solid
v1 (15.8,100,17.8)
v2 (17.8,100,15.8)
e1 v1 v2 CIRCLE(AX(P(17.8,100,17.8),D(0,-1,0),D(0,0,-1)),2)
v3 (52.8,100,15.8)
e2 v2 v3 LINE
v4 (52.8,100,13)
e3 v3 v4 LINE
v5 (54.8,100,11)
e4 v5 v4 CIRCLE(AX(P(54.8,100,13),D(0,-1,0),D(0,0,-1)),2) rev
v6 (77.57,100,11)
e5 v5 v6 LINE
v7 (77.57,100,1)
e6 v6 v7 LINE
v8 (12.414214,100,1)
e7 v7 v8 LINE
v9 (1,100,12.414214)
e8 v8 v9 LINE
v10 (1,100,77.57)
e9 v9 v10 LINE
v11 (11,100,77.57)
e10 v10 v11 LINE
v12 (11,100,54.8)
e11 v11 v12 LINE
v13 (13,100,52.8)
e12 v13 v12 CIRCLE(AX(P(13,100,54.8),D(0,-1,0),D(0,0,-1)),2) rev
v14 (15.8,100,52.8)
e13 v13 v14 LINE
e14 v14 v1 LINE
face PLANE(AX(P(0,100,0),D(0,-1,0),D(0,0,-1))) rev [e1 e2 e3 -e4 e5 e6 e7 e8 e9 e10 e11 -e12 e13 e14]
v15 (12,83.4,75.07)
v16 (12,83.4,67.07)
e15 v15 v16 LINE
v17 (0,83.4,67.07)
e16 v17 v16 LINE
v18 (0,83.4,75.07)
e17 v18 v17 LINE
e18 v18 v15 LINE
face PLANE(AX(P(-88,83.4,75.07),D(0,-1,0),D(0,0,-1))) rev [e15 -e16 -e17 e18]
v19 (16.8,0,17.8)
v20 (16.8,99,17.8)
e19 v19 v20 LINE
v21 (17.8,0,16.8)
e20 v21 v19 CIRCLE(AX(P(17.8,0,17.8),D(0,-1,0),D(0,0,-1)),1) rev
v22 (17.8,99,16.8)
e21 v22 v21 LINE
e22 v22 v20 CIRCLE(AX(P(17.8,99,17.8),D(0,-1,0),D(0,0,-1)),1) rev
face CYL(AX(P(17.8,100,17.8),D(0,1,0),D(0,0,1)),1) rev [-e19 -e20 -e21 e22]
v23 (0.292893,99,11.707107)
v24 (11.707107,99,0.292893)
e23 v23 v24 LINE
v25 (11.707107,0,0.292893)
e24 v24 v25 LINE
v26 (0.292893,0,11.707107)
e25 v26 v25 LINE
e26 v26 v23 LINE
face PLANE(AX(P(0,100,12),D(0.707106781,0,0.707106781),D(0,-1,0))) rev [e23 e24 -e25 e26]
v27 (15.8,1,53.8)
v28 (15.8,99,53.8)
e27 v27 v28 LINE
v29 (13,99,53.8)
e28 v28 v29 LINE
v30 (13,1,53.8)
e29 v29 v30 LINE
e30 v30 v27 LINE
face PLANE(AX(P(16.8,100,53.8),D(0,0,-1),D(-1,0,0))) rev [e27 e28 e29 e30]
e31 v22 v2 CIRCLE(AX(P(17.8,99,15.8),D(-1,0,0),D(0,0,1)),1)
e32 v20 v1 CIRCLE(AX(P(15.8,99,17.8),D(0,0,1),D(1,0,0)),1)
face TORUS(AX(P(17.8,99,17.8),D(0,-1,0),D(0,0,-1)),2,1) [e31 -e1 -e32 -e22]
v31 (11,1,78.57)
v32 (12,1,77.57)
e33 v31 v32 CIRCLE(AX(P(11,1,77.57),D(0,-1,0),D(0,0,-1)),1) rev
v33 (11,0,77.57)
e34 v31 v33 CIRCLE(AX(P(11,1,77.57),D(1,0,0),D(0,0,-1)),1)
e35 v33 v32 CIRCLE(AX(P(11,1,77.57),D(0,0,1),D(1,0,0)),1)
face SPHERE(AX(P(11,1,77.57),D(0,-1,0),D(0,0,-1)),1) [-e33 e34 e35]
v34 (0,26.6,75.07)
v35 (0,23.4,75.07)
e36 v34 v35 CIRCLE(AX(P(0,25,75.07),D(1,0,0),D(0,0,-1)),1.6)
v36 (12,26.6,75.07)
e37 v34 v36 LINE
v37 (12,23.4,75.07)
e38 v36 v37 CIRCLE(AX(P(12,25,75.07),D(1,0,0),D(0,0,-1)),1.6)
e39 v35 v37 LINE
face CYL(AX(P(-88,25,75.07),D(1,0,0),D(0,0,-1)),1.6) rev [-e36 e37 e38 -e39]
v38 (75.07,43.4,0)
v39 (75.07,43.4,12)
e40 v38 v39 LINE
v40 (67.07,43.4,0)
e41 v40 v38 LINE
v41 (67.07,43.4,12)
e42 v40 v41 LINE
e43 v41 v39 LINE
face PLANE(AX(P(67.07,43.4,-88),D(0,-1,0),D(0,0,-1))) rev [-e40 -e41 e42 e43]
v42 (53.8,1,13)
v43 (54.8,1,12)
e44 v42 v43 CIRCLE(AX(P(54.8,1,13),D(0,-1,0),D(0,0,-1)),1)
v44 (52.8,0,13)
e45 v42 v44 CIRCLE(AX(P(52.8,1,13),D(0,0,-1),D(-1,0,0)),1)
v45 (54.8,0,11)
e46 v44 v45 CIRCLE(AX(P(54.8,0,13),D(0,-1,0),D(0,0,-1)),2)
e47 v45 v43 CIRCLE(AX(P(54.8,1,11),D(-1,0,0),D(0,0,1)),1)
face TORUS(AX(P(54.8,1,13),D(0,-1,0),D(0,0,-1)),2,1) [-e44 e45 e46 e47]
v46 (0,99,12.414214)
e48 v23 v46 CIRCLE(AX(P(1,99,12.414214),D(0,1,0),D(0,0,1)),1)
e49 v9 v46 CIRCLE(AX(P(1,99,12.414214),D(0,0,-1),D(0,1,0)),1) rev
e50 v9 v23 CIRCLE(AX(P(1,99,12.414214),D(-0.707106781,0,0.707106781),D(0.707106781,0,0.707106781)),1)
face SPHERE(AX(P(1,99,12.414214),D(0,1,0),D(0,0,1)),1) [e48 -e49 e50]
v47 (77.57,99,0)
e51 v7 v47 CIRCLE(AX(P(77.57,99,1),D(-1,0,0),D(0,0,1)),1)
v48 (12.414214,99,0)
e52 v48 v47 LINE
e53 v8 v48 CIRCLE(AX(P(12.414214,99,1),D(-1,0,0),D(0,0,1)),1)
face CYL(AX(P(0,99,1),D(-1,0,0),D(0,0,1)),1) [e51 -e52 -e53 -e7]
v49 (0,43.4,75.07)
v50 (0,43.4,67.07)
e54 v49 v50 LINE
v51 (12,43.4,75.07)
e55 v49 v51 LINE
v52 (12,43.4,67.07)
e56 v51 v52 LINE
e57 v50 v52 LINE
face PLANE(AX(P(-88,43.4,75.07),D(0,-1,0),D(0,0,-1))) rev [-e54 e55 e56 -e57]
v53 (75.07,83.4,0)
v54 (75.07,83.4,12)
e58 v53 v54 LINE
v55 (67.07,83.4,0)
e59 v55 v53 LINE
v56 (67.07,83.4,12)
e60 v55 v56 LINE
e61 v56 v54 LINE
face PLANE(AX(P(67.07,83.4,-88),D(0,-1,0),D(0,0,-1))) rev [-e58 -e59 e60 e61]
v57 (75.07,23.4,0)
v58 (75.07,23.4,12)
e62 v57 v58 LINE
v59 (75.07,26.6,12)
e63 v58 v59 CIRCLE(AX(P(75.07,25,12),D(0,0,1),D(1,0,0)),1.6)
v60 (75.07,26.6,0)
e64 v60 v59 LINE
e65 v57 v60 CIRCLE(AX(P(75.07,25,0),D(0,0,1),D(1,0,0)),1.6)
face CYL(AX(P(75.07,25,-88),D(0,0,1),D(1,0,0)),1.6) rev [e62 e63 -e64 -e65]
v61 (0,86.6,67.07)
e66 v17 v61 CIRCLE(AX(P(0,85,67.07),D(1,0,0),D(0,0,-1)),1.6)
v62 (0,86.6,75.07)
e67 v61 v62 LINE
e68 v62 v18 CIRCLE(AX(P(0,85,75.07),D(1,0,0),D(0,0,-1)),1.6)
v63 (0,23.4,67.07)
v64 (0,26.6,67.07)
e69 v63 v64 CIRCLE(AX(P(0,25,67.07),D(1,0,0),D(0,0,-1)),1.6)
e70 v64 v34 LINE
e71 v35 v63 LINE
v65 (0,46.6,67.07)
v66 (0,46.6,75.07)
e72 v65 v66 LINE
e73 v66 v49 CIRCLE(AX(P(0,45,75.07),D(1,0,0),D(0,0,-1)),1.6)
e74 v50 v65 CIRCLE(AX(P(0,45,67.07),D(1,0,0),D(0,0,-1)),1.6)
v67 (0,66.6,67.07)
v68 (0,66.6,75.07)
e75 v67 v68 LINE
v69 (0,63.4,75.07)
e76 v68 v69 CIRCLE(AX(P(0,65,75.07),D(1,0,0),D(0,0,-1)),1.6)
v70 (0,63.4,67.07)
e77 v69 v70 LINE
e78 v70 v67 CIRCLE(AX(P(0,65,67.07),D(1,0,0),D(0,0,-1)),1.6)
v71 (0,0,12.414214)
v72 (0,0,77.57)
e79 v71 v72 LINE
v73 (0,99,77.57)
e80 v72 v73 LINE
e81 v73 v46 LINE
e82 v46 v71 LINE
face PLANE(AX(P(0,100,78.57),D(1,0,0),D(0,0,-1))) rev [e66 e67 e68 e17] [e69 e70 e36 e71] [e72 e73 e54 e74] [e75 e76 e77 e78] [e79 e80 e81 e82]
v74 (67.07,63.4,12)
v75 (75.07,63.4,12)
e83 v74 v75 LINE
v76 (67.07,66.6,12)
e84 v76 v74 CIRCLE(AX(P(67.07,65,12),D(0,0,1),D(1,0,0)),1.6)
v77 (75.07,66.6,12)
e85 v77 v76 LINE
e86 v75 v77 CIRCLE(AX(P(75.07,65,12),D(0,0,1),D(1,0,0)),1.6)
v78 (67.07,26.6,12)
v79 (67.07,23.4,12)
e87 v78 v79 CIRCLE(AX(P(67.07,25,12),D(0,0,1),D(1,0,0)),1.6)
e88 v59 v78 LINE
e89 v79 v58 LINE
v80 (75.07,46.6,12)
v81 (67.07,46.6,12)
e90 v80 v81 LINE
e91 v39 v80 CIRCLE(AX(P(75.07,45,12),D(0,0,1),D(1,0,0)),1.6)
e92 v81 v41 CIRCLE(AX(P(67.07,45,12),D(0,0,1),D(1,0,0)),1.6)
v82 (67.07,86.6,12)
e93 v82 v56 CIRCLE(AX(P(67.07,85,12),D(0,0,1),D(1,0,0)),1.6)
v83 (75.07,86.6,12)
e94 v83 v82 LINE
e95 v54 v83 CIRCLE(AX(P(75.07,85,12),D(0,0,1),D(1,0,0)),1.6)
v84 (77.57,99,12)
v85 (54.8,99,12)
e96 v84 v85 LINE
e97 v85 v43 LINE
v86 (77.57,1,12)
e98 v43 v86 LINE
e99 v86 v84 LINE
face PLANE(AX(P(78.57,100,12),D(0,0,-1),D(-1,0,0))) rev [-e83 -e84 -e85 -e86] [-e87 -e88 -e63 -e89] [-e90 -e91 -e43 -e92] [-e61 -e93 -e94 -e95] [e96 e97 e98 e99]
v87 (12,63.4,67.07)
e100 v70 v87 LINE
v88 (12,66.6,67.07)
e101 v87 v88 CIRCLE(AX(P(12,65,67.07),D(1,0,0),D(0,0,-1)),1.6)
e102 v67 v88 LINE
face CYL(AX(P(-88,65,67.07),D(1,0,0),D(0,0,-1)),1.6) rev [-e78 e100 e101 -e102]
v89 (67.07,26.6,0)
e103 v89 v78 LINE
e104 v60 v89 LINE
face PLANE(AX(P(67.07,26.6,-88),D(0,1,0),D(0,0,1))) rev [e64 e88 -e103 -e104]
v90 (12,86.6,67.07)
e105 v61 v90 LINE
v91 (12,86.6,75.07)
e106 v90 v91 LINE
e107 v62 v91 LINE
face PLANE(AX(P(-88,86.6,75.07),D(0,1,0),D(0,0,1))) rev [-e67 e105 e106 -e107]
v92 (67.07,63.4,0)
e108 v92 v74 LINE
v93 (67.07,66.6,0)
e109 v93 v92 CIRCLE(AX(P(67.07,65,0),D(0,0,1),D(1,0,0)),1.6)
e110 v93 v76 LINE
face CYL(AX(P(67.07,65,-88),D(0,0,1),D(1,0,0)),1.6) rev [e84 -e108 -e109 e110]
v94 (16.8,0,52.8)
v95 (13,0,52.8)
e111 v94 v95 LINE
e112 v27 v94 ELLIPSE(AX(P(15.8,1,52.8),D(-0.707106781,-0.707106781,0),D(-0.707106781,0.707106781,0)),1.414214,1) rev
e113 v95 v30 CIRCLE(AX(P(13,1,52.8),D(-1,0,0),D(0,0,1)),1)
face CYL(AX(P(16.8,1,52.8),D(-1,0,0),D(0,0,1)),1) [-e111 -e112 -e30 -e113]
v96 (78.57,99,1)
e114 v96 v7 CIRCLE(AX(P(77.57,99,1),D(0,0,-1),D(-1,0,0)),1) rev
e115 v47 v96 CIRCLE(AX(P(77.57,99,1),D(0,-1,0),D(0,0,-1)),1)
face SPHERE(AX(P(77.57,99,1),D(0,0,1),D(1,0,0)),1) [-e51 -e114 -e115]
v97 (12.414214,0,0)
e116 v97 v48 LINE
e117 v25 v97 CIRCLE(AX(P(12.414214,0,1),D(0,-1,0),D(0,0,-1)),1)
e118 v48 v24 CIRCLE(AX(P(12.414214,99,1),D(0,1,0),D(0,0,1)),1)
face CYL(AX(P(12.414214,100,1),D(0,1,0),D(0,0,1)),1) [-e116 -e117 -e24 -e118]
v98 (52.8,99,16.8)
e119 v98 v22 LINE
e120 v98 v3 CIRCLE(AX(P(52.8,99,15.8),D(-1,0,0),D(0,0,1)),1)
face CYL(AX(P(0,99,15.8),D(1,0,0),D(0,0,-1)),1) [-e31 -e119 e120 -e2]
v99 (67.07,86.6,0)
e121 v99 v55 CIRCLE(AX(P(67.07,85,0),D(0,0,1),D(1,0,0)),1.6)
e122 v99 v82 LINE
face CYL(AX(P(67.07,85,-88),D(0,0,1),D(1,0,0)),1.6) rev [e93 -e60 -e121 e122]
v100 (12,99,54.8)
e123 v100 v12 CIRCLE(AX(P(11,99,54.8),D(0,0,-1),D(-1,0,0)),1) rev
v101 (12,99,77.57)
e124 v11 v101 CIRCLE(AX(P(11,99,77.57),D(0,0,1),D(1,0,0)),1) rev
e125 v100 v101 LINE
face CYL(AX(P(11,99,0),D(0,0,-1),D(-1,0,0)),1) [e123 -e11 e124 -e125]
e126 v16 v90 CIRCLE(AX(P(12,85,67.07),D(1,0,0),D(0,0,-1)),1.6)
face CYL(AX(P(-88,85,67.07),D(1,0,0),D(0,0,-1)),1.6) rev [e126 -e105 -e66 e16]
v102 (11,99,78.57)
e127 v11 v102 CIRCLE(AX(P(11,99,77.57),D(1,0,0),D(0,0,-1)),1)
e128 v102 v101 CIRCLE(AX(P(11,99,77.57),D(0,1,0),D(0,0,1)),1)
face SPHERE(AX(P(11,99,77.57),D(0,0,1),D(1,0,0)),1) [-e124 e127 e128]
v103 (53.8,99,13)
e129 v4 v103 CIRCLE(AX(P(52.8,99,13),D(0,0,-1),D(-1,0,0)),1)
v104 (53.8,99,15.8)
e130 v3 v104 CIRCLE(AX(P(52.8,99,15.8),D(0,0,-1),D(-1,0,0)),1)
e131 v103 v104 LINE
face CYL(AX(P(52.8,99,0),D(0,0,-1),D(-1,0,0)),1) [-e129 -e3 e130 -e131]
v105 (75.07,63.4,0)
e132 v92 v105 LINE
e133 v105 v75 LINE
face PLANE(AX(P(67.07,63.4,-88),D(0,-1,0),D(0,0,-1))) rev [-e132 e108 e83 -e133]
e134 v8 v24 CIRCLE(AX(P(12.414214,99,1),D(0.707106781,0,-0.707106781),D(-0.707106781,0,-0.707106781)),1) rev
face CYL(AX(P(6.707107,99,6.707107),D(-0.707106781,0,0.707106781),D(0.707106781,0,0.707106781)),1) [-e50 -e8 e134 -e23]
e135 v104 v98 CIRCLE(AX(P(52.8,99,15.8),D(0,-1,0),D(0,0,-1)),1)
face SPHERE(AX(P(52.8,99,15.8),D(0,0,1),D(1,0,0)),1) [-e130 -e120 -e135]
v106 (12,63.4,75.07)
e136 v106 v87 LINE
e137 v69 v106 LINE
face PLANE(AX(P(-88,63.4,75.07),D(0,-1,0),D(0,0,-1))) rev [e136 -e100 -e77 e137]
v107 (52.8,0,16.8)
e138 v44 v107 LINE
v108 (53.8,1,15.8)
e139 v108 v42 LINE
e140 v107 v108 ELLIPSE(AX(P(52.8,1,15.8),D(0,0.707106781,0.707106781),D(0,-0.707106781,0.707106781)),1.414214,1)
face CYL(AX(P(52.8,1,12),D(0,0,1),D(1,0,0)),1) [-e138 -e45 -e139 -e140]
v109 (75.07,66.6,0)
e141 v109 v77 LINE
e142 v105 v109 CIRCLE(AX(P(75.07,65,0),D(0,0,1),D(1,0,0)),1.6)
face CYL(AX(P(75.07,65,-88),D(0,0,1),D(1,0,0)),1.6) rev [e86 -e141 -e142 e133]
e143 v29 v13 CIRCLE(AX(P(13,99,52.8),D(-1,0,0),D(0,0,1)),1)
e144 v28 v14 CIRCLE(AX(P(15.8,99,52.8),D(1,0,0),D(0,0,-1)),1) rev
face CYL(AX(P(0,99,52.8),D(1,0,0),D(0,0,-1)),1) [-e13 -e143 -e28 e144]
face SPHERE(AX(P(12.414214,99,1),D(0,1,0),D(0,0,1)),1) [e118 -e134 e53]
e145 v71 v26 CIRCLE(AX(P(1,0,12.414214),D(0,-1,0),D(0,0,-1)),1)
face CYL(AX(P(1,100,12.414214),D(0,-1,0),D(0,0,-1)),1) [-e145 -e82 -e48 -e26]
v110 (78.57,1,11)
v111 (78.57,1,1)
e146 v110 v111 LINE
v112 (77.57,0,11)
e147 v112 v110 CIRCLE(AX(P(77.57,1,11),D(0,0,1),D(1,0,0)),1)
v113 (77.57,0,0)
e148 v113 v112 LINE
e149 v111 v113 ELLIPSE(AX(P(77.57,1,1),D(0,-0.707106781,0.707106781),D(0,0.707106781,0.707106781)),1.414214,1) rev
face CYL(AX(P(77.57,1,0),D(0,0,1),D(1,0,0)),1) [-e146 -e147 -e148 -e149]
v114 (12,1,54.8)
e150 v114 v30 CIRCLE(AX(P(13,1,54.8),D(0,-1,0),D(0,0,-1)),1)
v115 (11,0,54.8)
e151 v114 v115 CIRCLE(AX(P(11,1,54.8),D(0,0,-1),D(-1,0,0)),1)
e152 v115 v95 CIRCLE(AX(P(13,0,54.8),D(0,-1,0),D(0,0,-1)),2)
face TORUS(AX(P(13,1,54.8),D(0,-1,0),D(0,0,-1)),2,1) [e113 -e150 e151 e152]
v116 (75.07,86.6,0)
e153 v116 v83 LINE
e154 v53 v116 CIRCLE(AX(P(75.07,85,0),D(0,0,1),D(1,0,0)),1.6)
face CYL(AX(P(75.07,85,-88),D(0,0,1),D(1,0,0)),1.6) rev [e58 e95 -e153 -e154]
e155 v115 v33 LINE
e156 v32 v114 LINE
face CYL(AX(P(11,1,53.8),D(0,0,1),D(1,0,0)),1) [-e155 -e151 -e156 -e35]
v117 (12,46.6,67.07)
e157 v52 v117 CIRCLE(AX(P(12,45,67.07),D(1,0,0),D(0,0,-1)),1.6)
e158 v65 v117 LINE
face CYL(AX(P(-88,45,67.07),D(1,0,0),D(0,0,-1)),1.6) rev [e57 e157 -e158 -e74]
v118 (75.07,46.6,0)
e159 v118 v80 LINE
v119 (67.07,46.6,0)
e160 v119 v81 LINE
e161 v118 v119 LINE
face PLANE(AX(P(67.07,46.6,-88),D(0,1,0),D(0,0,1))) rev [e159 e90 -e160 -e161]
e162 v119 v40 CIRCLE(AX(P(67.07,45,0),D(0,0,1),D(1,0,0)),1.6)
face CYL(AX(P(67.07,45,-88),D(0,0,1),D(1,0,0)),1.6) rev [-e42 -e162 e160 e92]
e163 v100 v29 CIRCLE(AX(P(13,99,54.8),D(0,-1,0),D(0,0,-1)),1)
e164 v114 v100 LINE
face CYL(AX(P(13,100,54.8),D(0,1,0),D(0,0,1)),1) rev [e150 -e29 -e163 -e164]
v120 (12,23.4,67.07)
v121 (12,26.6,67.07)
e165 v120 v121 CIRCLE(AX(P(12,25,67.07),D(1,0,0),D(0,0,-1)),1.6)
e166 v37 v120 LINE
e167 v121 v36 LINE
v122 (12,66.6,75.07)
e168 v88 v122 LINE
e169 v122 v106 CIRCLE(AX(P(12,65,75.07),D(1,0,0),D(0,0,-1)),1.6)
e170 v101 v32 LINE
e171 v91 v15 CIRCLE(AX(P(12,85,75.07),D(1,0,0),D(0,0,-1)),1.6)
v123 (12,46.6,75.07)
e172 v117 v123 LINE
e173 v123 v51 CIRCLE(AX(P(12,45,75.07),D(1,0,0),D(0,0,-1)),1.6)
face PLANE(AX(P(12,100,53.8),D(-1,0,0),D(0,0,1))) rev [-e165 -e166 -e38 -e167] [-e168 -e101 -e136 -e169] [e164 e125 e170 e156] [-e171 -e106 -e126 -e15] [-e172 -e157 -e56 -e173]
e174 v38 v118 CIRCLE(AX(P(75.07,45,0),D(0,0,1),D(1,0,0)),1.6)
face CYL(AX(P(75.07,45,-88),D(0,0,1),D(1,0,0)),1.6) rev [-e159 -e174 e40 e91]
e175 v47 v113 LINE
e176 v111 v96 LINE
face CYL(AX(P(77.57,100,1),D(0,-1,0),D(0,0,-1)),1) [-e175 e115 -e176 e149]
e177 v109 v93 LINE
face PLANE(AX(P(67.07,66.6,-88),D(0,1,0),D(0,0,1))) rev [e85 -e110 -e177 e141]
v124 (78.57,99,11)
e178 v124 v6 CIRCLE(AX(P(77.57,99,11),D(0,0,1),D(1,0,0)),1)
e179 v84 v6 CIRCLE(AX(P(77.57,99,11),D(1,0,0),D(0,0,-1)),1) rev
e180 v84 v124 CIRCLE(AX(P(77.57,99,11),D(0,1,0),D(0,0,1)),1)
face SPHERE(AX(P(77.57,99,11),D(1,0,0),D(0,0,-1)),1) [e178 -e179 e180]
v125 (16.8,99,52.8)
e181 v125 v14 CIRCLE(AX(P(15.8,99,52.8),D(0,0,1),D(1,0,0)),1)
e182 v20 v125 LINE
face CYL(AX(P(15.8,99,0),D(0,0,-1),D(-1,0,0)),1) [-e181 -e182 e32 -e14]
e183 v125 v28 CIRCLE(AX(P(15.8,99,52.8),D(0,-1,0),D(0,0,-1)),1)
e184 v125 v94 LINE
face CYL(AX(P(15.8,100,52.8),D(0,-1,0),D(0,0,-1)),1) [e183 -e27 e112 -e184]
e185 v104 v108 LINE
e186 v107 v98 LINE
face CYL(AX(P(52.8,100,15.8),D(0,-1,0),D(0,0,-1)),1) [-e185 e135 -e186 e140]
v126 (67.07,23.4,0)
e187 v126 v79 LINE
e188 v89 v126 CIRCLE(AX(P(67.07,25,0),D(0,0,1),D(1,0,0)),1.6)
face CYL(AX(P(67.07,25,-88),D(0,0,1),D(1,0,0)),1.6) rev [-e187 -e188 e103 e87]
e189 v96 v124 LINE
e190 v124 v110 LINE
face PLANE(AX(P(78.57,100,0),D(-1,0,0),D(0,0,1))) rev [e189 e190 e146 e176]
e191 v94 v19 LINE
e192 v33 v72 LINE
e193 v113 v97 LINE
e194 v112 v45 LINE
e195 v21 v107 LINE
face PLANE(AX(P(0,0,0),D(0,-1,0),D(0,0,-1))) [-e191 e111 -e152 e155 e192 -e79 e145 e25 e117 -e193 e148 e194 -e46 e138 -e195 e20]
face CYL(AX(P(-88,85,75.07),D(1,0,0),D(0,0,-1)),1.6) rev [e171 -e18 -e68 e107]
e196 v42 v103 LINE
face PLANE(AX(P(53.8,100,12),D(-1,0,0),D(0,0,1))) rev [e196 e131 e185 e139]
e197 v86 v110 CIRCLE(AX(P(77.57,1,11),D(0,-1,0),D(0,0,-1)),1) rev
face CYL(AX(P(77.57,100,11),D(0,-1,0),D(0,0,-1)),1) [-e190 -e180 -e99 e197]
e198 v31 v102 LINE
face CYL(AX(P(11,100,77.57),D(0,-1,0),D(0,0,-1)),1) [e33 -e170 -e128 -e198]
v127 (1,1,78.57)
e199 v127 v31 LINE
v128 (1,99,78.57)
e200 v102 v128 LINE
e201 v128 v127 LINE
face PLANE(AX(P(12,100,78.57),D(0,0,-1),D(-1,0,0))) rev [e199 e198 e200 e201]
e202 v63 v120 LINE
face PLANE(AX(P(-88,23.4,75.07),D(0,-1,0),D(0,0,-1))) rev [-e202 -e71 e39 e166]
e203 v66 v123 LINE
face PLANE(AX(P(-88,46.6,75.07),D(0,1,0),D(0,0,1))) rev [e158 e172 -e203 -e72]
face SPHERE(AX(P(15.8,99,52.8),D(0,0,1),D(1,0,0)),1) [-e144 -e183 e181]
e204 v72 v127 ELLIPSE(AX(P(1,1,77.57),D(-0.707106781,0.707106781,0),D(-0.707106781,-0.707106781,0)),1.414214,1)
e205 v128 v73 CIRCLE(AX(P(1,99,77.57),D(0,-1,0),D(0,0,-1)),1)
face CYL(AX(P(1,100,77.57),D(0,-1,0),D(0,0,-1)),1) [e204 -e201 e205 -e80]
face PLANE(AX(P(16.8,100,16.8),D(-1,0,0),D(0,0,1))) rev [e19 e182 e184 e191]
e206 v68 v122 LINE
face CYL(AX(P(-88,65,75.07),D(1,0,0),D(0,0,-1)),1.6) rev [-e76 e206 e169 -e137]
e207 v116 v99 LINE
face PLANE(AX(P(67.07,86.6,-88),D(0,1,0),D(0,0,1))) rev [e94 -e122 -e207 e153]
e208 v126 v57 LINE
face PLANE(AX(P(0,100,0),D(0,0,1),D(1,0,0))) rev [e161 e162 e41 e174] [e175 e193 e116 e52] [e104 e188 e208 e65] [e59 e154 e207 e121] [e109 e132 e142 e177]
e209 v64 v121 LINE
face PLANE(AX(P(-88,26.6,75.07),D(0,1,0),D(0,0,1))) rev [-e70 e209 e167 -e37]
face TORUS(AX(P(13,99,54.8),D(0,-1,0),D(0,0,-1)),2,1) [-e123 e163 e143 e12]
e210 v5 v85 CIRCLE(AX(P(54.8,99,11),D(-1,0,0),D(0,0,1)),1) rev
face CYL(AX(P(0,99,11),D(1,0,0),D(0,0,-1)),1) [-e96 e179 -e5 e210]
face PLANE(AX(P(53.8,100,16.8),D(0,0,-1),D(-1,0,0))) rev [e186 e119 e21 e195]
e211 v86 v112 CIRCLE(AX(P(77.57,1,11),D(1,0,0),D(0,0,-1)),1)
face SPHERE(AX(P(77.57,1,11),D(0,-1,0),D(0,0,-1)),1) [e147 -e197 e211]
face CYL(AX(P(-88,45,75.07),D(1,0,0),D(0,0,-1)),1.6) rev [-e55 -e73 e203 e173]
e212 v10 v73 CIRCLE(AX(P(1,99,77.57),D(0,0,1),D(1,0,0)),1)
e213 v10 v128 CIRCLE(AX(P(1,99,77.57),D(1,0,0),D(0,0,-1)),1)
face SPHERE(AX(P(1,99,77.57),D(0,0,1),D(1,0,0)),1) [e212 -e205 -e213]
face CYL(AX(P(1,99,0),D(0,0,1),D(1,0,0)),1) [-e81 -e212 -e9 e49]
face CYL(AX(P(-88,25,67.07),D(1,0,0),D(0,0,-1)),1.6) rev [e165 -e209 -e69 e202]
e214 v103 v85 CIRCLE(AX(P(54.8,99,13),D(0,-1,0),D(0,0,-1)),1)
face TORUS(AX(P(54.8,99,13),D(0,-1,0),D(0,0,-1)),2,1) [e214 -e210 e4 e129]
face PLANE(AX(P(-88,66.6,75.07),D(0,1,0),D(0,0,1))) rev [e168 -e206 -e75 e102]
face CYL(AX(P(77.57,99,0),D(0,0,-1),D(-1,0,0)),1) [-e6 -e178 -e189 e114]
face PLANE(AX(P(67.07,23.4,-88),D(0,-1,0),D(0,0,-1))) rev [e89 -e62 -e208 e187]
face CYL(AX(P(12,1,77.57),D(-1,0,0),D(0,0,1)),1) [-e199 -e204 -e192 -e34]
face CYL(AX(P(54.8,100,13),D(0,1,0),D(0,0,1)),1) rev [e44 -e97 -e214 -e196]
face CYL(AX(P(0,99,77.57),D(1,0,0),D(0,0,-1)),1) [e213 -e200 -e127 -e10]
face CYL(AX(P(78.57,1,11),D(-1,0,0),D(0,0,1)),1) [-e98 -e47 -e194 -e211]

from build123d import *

# Parameters (mm, degrees)
BOSS_EXTRUDE1_DEPTH = 100
FILLET1_R           = 1
CHAMFER1_SIZE       = 12
FILLET2_R           = 1
CUT_EXTRUDE1_DEPTH  = 100
CUT_EXTRUDE2_DEPTH  = 100


with BuildPart() as part:
    # Sketch1 → Boss-Extrude1 (new body)
    with BuildSketch(Plane(origin=(0, 0, 0), x_dir=(1, 0, 0), z_dir=(0, 1, 0))):
        Polygon((0, 0), (78.57, 0), (78.57, -12), (53.8, -12), (53.8, -16.8), (16.8, -16.8), (16.8, -53.8), (12, -53.8), (12, -78.57), (0, -78.57), align=None)
    extrude(amount=BOSS_EXTRUDE1_DEPTH)

    # Fillet1
    fillet1_edges = [part.edges().sort_by_distance(p)[0] for p in [
        (78.57, 0, 6),
        (66.185, 0, 12),
        (53.8, 0, 14.4),
        (14.4, 0, 53.8),
        (12, 100, 66.185),
        (12, 0, 66.185),
        (6, 0, 78.57),
        (14.4, 100, 53.8),
        (78.57, 50, 0),
        (78.57, 50, 12),
        (53.8, 50, 12),
        (53.8, 50, 16.8),
        (16.8, 50, 16.8),
        (16.8, 50, 53.8),
        (12, 50, 53.8),
        (12, 50, 78.57),
        (0, 50, 78.57),
        (53.8, 100, 14.4),
        (66.185, 100, 12),
        (78.57, 100, 6),
        (6, 100, 78.57),
    ]]
    fillet(fillet1_edges, radius=FILLET1_R)

    # Chamfer1
    chamfer1_edges = [part.edges().sort_by_distance(p)[0] for p in [
        (0, 50, 0),
    ]]
    chamfer(chamfer1_edges, length=CHAMFER1_SIZE)

    # Fillet2
    # the kernel refuses this fillet: 1 mm, written as the material it takes off along each edge
    with BuildSketch(Plane(origin=(1, 99, 77.57), x_dir=(-1, 0, 0), z_dir=(0, 1, 0))) as fillet2_piece_1_section:
        Polygon((0, 0), (FILLET2_R, 0), (FILLET2_R, FILLET2_R), (0, FILLET2_R), align=None)
    fillet2_piece_1 = extrude(amount=FILLET2_R, mode=Mode.PRIVATE)
    fillet2_piece_1 = fillet2_piece_1 - Plane(origin=(1, 99, 77.57), x_dir=(0.7071067811865475, 0, -0.7071067811865477), z_dir=(0, 1, 0)) * Sphere(FILLET2_R, mode=Mode.PRIVATE)
    add(fillet2_piece_1, mode=Mode.SUBTRACT)
    with BuildSketch(Plane(origin=(15.8, 99, 52.8), x_dir=(1, 0, 0), z_dir=(0, 1, 0))) as fillet2_piece_2_section:
        Polygon((0, 0), (FILLET2_R, 0), (FILLET2_R, -FILLET2_R), (0, -FILLET2_R), align=None)
    fillet2_piece_2 = extrude(amount=FILLET2_R, mode=Mode.PRIVATE)
    fillet2_piece_2 = fillet2_piece_2 - Plane(origin=(15.8, 99, 52.8), x_dir=(-0.7071067811865476, 0, -0.7071067811865474), z_dir=(0, 1, 0)) * Sphere(FILLET2_R, mode=Mode.PRIVATE)
    add(fillet2_piece_2, mode=Mode.SUBTRACT)
    with BuildSketch(Plane(origin=(52.8, 99, 15.8), x_dir=(0, 0, 1), z_dir=(0, 1, 0))) as fillet2_piece_3_section:
        Polygon((0, 0), (FILLET2_R, 0), (FILLET2_R, FILLET2_R), (0, FILLET2_R), align=None)
    fillet2_piece_3 = extrude(amount=FILLET2_R, mode=Mode.PRIVATE)
    fillet2_piece_3 = fillet2_piece_3 - Plane(origin=(52.8, 99, 15.8), x_dir=(-0.7071067811865475, 0, -0.7071067811865475), z_dir=(0, 1, 0)) * Sphere(FILLET2_R, mode=Mode.PRIVATE)
    add(fillet2_piece_3, mode=Mode.SUBTRACT)
    with BuildSketch(Plane(origin=(77.57, 99, 1), x_dir=(0, 1, 0), z_dir=(0, 0, -1))) as fillet2_piece_4_section:
        Polygon((0, 0), (FILLET2_R, 0), (FILLET2_R, FILLET2_R), (0, FILLET2_R), align=None)
    fillet2_piece_4 = extrude(amount=FILLET2_R, mode=Mode.PRIVATE)
    fillet2_piece_4 = fillet2_piece_4 - Plane(origin=(77.57, 99, 1), x_dir=(-0.7071067811865475, -0.7071067811865475, 0), z_dir=(0, 0, -1)) * Sphere(FILLET2_R, mode=Mode.PRIVATE)
    add(fillet2_piece_4, mode=Mode.SUBTRACT)
    with BuildSketch(Plane(origin=(1, 99, 12.414213562), x_dir=(-1, 0, 0), z_dir=(0, 1, 0))) as fillet2_piece_5_section:
        Polygon((0, 0), (FILLET2_R, 0), (FILLET2_R, -FILLET2_R * 0.414213562373), (FILLET2_R * 0.707106781187, -FILLET2_R * 0.707106781187), align=None)
    fillet2_piece_5 = extrude(amount=FILLET2_R, mode=Mode.PRIVATE)
    fillet2_piece_5 = fillet2_piece_5 - Plane(origin=(1, 99, 12.414213562), x_dir=(0.9238795325112868, 0, 0.3826834323650896), z_dir=(0, 1, 0)) * Sphere(FILLET2_R, mode=Mode.PRIVATE)
    add(fillet2_piece_5, mode=Mode.SUBTRACT)
    with BuildSketch(Plane(origin=(12.414213562, 99, 1), x_dir=(0, 0, -1), z_dir=(0, 1, 0))) as fillet2_piece_6_section:
        Polygon((0, 0), (FILLET2_R, 0), (FILLET2_R, FILLET2_R * 0.414213562373), (FILLET2_R * 0.707106781187, FILLET2_R * 0.707106781187), align=None)
    fillet2_piece_6 = extrude(amount=FILLET2_R, mode=Mode.PRIVATE)
    fillet2_piece_6 = fillet2_piece_6 - Plane(origin=(12.414213562, 99, 1), x_dir=(0.3826834323650898, 0, 0.9238795325112867), z_dir=(0, 1, 0)) * Sphere(FILLET2_R, mode=Mode.PRIVATE)
    add(fillet2_piece_6, mode=Mode.SUBTRACT)
    with BuildSketch(Plane(origin=(0, 100, 77.57), x_dir=(1, 0, 0), z_dir=(0, 0, -1))) as fillet2_piece_7:
        with BuildLine():
            CenterArc((FILLET2_R, FILLET2_R), FILLET2_R, 180, 90)
            Line((0, FILLET2_R), (0, 0))
            Line((0, 0), (FILLET2_R, 0))
        make_face()
    extrude(amount=65.155786438, mode=Mode.SUBTRACT)
    with BuildSketch(Plane(origin=(0, -1.035533906, 12), x_dir=(0.7071067811865466, 0, -0.7071067811865485), z_dir=(0, 1, 0)), Plane(origin=(12, -1.035533906, 0), x_dir=(1, 0, 0), z_dir=(0, 1, 0))) as fillet2_piece_8:
        with BuildLine():
            CenterArc((FILLET2_R * 0.414213562373, -FILLET2_R), FILLET2_R, 90, 45)
            Line((-FILLET2_R * 0.292893218813, -FILLET2_R * 0.292893218813), (0, 0))
            Line((0, 0), (FILLET2_R * 0.414213562373, 0))
        make_face()
    extrude(amount=100.035533906, mode=Mode.SUBTRACT)
    with BuildSketch(Plane(origin=(11.707106781, 100, 0.292893219), x_dir=(0, -1, 0), z_dir=(-0.7071067811865475, 0, 0.7071067811865476))) as fillet2_piece_9:
        with BuildLine():
            CenterArc((FILLET2_R, FILLET2_R), FILLET2_R, 180, 90)
            Line((0, FILLET2_R), (0, 0))
            Line((0, 0), (FILLET2_R, 0))
        make_face()
    extrude(amount=16.142135624, mode=Mode.SUBTRACT)
    with BuildSketch(Plane(origin=(16.8, 100, 17.8), x_dir=(-1, 0, 0), z_dir=(0, 0, 1)), Plane(origin=(52.8, 100, 16.8), x_dir=(0, 0, -1), z_dir=(-1, 0, 0))) as fillet2_piece_10:
        with BuildLine():
            CenterArc((FILLET2_R, FILLET2_R), FILLET2_R, 180, 90)
            Line((0, FILLET2_R), (0, 0))
            Line((0, 0), (FILLET2_R, 0))
        make_face()
    extrude(amount=35, mode=Mode.SUBTRACT)
    with BuildSketch(Plane(origin=(12.414213562, 100, 0), x_dir=(0, -1, 0), z_dir=(1, 0, 0))) as fillet2_piece_11:
        with BuildLine():
            CenterArc((FILLET2_R, -FILLET2_R), FILLET2_R, 90, 90)
            Line((0, -FILLET2_R), (0, 0))
            Line((0, 0), (FILLET2_R, 0))
        make_face()
    extrude(amount=65.155786438, mode=Mode.SUBTRACT)
    with BuildSketch(Plane(origin=(17.8, 100, 17.8), x_dir=(0, 0, -1), z_dir=(1, 0, 0))) as fillet2_piece_12:
        with BuildLine():
            CenterArc((1 + FILLET2_R, -FILLET2_R), FILLET2_R, 90, 90)
            Line((1, -FILLET2_R), (1, 0))
            Line((1, 0), (1 + FILLET2_R, 0))
        make_face()
    revolve(axis=Axis((17.8, 100, 17.8), (0, 1, 0)), revolution_arc=90, mode=Mode.SUBTRACT)

    # Sketch2 → Cut-Extrude1 (cut)
    with BuildSketch(Plane(origin=(12, 0, 0), x_dir=(0, 0, -1), z_dir=(1, 0, 0))):
        with BuildLine():
            Line((-75.07, 86.6), (-67.07, 86.6))
            ThreePointArc((-67.07, 86.6), (-65.47, 85), (-67.07, 83.4))
            Line((-67.07, 83.4), (-75.07, 83.4))
            ThreePointArc((-75.07, 83.4), (-76.67, 85), (-75.07, 86.6))
        make_face()
        with BuildLine():
            Line((-75.07, 66.6), (-67.07, 66.6))
            ThreePointArc((-67.07, 66.6), (-65.47, 65), (-67.07, 63.4))
            Line((-67.07, 63.4), (-75.07, 63.4))
            ThreePointArc((-75.07, 63.4), (-76.67, 65), (-75.07, 66.6))
        make_face()
        with BuildLine():
            Line((-75.07, 46.6), (-67.07, 46.6))
            ThreePointArc((-67.07, 46.6), (-65.47, 45), (-67.07, 43.4))
            Line((-67.07, 43.4), (-75.07, 43.4))
            ThreePointArc((-75.07, 43.4), (-76.67, 45), (-75.07, 46.6))
        make_face()
        with BuildLine():
            Line((-75.07, 26.6), (-67.07, 26.6))
            ThreePointArc((-67.07, 26.6), (-65.47, 25), (-67.07, 23.4))
            Line((-67.07, 23.4), (-75.07, 23.4))
            ThreePointArc((-75.07, 23.4), (-76.67, 25), (-75.07, 26.6))
        make_face()
    extrude(amount=-CUT_EXTRUDE1_DEPTH, mode=Mode.SUBTRACT)

    # Sketch3 → Cut-Extrude2 (cut)
    with BuildSketch(Plane.XY.offset(12)):
        with BuildLine():
            Line((67.07, 86.6), (75.07, 86.6))
            ThreePointArc((75.07, 86.6), (76.67, 85), (75.07, 83.4))
            Line((75.07, 83.4), (67.07, 83.4))
            ThreePointArc((67.07, 83.4), (65.47, 85), (67.07, 86.6))
        make_face()
        with BuildLine():
            Line((67.07, 66.6), (75.07, 66.6))
            ThreePointArc((75.07, 66.6), (76.67, 65), (75.07, 63.4))
            Line((75.07, 63.4), (67.07, 63.4))
            ThreePointArc((67.07, 63.4), (65.47, 65), (67.07, 66.6))
        make_face()
        with BuildLine():
            Line((67.07, 46.6), (75.07, 46.6))
            ThreePointArc((75.07, 46.6), (76.67, 45), (75.07, 43.4))
            Line((75.07, 43.4), (67.07, 43.4))
            ThreePointArc((67.07, 43.4), (65.47, 45), (67.07, 46.6))
        make_face()
        with BuildLine():
            Line((67.07, 26.6), (75.07, 26.6))
            ThreePointArc((75.07, 26.6), (76.67, 25), (75.07, 23.4))
            Line((75.07, 23.4), (67.07, 23.4))
            ThreePointArc((67.07, 23.4), (65.47, 25), (67.07, 26.6))
        make_face()
    extrude(amount=-CUT_EXTRUDE2_DEPTH, mode=Mode.SUBTRACT)


solid = part.part
